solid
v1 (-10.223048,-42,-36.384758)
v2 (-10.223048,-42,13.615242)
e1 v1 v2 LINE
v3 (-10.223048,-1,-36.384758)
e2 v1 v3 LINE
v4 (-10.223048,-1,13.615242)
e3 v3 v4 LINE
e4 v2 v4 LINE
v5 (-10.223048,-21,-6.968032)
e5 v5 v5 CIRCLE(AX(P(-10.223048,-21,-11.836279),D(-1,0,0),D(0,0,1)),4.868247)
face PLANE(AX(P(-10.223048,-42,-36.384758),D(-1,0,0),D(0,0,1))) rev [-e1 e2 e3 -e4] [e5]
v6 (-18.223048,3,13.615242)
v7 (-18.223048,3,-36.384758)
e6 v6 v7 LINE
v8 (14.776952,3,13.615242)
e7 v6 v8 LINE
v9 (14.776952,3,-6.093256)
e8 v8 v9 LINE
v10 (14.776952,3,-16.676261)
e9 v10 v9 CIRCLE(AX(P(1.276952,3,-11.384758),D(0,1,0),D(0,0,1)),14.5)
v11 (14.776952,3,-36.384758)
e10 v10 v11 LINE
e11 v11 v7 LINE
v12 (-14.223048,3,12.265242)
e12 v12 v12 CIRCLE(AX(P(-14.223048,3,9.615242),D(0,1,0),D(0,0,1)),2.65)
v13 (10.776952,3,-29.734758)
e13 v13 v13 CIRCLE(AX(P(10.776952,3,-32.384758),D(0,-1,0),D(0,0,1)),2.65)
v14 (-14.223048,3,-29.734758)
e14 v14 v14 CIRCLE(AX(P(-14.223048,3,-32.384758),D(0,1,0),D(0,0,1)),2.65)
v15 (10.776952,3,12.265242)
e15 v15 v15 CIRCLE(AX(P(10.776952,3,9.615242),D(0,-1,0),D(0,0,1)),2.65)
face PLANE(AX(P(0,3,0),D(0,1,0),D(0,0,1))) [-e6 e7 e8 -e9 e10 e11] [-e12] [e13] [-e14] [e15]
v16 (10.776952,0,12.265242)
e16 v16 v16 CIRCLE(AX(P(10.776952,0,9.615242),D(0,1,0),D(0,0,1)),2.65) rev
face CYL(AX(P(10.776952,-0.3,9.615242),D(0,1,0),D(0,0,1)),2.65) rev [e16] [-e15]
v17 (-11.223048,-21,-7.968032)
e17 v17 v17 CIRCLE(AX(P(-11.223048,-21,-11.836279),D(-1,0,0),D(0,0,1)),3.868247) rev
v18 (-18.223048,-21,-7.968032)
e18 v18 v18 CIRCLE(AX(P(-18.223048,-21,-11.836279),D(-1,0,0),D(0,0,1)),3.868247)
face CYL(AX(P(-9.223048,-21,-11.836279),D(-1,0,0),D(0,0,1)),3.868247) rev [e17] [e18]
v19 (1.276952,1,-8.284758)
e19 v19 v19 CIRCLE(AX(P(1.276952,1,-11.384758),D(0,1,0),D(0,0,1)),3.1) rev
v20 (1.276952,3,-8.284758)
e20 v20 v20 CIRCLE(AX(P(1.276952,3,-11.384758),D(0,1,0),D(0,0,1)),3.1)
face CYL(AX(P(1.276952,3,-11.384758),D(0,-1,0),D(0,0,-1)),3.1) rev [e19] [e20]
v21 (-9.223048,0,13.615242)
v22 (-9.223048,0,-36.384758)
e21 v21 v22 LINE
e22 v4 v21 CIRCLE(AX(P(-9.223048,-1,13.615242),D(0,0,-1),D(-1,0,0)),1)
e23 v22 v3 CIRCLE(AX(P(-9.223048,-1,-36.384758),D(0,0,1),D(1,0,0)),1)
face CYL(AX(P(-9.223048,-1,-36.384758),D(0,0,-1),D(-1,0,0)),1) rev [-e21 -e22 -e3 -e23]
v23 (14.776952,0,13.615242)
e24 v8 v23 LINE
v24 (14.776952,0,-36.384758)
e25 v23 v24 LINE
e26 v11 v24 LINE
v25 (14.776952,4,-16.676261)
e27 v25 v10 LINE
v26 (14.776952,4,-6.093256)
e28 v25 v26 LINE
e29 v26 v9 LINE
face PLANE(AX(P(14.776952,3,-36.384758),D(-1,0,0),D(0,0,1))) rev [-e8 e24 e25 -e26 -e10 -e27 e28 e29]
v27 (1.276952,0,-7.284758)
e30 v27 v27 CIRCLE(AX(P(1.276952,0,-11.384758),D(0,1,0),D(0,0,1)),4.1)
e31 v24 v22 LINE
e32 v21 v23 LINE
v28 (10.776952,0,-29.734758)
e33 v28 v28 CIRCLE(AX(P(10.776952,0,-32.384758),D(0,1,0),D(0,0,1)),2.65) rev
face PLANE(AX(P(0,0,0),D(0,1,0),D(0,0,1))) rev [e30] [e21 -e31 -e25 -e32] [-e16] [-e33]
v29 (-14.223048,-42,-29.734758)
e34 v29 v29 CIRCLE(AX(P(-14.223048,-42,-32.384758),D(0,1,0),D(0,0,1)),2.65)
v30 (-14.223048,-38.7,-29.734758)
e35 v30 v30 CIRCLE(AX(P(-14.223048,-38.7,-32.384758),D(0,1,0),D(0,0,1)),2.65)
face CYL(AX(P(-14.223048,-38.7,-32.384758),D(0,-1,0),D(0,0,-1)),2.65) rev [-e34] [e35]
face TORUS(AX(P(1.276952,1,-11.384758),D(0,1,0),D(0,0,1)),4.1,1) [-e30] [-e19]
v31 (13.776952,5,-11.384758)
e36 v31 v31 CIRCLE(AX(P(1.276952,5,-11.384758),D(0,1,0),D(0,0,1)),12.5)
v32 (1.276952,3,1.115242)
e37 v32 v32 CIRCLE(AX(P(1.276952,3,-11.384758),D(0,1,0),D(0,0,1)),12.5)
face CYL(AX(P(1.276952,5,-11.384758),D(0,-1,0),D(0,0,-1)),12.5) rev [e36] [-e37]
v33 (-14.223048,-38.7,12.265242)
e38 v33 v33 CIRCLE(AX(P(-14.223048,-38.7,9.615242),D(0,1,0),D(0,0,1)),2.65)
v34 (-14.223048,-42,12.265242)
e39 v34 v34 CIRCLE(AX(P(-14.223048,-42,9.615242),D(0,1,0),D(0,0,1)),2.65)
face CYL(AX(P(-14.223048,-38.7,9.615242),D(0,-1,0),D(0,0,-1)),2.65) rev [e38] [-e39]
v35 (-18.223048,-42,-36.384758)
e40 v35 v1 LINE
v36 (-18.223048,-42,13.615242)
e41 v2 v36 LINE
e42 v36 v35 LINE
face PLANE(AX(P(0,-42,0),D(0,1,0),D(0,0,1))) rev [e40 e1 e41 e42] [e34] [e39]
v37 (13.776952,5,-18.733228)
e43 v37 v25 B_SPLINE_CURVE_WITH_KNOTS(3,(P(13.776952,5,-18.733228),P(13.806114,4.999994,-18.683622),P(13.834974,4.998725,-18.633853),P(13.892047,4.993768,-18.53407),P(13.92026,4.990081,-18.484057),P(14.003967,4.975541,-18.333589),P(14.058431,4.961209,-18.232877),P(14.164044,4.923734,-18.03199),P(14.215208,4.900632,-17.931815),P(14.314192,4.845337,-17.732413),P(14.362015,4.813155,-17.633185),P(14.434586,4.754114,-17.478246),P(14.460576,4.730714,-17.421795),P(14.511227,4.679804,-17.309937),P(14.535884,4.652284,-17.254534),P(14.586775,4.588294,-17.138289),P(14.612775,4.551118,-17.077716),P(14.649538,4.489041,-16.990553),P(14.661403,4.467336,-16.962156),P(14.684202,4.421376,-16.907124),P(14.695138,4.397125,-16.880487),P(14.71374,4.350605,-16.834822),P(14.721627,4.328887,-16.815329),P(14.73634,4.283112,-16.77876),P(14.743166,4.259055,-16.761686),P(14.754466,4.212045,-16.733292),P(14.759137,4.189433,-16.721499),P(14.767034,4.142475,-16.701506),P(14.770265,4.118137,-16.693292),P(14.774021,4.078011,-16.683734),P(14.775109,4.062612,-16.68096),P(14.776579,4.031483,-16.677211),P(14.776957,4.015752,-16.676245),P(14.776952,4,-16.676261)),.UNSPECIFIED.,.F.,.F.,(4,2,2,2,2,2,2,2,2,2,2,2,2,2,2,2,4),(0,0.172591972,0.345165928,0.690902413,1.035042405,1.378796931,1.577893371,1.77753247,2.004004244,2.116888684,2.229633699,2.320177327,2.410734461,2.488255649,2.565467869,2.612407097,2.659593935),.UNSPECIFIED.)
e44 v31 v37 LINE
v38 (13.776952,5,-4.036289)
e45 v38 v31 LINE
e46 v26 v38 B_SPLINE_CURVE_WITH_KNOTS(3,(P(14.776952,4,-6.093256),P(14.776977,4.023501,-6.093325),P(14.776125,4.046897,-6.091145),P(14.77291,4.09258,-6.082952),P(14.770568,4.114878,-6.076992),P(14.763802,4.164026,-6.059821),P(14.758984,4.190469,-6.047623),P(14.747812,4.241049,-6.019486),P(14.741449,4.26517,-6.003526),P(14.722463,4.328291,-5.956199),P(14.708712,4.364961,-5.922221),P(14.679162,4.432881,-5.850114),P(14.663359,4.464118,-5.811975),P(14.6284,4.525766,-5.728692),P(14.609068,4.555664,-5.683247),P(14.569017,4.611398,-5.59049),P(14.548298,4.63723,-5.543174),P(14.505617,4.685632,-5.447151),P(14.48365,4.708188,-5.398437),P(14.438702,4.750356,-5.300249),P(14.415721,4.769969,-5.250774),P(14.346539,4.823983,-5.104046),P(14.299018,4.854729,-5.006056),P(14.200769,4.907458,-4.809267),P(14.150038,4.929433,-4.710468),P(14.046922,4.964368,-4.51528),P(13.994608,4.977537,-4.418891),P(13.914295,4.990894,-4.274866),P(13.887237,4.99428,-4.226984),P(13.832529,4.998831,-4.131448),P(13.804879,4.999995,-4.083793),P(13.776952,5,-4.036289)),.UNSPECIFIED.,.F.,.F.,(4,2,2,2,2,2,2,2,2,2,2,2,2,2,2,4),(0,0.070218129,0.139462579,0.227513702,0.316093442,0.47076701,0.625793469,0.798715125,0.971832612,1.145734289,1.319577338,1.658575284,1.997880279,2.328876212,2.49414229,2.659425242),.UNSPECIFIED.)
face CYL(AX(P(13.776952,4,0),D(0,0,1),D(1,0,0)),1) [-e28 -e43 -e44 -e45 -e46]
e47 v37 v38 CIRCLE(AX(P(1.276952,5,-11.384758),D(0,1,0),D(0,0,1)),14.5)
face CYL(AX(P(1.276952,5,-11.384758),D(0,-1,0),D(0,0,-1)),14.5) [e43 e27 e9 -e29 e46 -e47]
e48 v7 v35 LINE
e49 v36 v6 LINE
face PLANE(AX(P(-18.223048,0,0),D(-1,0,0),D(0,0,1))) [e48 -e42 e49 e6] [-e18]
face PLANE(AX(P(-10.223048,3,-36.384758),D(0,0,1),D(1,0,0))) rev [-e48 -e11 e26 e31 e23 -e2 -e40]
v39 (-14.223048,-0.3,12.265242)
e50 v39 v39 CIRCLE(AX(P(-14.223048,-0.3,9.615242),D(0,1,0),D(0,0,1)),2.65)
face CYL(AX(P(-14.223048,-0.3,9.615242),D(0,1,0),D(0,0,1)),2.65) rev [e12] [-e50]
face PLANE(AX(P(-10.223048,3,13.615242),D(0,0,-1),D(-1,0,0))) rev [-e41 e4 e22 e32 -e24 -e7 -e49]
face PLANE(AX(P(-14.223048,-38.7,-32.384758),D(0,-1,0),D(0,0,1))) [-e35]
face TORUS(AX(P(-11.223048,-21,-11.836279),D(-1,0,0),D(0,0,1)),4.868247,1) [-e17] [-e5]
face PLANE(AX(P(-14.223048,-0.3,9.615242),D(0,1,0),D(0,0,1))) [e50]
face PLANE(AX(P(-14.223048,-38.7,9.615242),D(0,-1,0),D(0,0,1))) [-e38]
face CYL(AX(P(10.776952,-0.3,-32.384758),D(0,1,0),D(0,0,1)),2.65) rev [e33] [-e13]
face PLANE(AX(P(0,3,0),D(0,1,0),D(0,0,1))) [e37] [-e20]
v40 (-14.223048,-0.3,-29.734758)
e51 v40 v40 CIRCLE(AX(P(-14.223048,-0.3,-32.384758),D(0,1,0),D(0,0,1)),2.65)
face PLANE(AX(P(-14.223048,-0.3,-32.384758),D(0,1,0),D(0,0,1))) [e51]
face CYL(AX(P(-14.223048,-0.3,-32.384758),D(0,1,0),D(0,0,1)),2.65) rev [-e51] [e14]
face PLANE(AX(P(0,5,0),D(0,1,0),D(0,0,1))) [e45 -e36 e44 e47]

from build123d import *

# Parameters (mm, degrees)
SKETCH1_W           = 25
SKETCH1_H           = 50
SKETCH1_R           = 3.1
BOSS_EXTRUDE1_DEPTH = 3
SKETCH2_W           = 50
SKETCH2_H           = 3
BOSS_EXTRUDE2_DEPTH = 8
SKETCH3_W           = 8
SKETCH3_H           = 50
BOSS_EXTRUDE3_DEPTH = 42
SKETCH4_R           = 2.65
CUT_EXTRUDE1_DEPTH  = 3.3
FILLET1_R           = 1
SKETCH5_R           = 3.868246804
CUT_EXTRUDE2_DEPTH  = 9
FILLET2_R           = 1
SKETCH6_R           = 12.5
BOSS_EXTRUDE4_DEPTH = 2
FILLET3_R           = 1
FILLET4_R           = 1


with BuildPart() as part:
    # Sketch1 → Boss-Extrude1 (new body)
    with BuildSketch(Plane(origin=(0, 0, 0), x_dir=(1, 0, 0), z_dir=(0, 1, 0))):
        with Locations((2.276951673, 11.384758364)):
            Rectangle(SKETCH1_W, SKETCH1_H)
        with Locations(Location((1.276951673, 11.384758364, 0), (0, 0, 270))):
            Circle(SKETCH1_R, mode=Mode.SUBTRACT)
    extrude(amount=BOSS_EXTRUDE1_DEPTH)

    # Sketch2 → Boss-Extrude2 (add)
    with BuildSketch(Plane.ZY.offset(10.223048327)):
        with Locations((-11.384758364, 1.5)):
            Rectangle(SKETCH2_W, SKETCH2_H)
    extrude(amount=BOSS_EXTRUDE2_DEPTH)

    # Sketch3 → Boss-Extrude3 (add)
    with BuildSketch(Plane.XZ):
        with Locations((-14.223048327, -11.384758364)):
            Rectangle(SKETCH3_W, SKETCH3_H)
    extrude(amount=BOSS_EXTRUDE3_DEPTH)

    # Sketch4 → Cut-Extrude1 (cut)
    with BuildSketch(Plane(origin=(0, 3, 0), x_dir=(1, 0, 0), z_dir=(0, 1, 0))):
        with Locations(Location((-14.223048327, 32.384758364, 0), (0, 0, 270))):
            Circle(SKETCH4_R)
        with Locations(Location((-14.223048327, -9.615241636, 0), (0, 0, 270))):
            Circle(SKETCH4_R)
    cut_extrude1 = extrude(amount=-CUT_EXTRUDE1_DEPTH, mode=Mode.SUBTRACT)

    # Mirror1: Cut-Extrude1 across plane
    add(cut_extrude1.mirror(Plane.ZX.offset(-19.5)), mode=Mode.SUBTRACT)

    # Fillet1
    fillet1_edges = [part.edges().sort_by_distance(p)[0] for p in [
        (1.276951673, 0, -14.484758364),
    ]]
    fillet(fillet1_edges, radius=FILLET1_R)

    # Sketch5 → Cut-Extrude2 (cut)
    with BuildSketch(Plane.ZY.offset(18.223048327)):
        with Locations((-11.836279124, -21)):
            Circle(SKETCH5_R)
    extrude(amount=-CUT_EXTRUDE2_DEPTH, mode=Mode.SUBTRACT)

    # Fillet2
    fillet2_edges = [part.edges().sort_by_distance(p)[0] for p in [
        (-10.223048327, -21, -15.704525928),
    ]]
    fillet(fillet2_edges, radius=FILLET2_R)

    # Mirror2: Cut-Extrude1 across plane
    add(cut_extrude1.mirror(Plane.ZY.offset(1.723048327)), mode=Mode.SUBTRACT)

    # Sketch6 → Boss-Extrude4 (add)
    with BuildSketch(Plane(origin=(0, 3, 0), x_dir=(1, 0, 0), z_dir=(0, 1, 0))):
        with BuildLine():
            Line((14.776951673, 6.093255742), (14.776951673, 16.676260986))
            ThreePointArc((14.776951673, 16.676260986), (-13.223048327, 11.384758364), (14.776951673, 6.093255742))
        make_face()
        with Locations(Location((1.276951673, 11.384758364, 0), (0, 0, 270))):
            Circle(SKETCH6_R, mode=Mode.SUBTRACT)
    extrude(amount=BOSS_EXTRUDE4_DEPTH)

    # Fillet3
    fillet3_edges = [part.edges().sort_by_distance(p)[0] for p in [
        (-10.223048327, 0, -11.384758364),
    ]]
    fillet(fillet3_edges, radius=FILLET3_R)

    # Fillet4
    fillet4_edges = [part.edges().sort_by_distance(p)[0] for p in [
        (14.776951673, 5, -11.384758364),
    ]]
    fillet(fillet4_edges, radius=FILLET4_R - 0.0001)  # a hair under: the kernel refuses the full size


solid = part.part
